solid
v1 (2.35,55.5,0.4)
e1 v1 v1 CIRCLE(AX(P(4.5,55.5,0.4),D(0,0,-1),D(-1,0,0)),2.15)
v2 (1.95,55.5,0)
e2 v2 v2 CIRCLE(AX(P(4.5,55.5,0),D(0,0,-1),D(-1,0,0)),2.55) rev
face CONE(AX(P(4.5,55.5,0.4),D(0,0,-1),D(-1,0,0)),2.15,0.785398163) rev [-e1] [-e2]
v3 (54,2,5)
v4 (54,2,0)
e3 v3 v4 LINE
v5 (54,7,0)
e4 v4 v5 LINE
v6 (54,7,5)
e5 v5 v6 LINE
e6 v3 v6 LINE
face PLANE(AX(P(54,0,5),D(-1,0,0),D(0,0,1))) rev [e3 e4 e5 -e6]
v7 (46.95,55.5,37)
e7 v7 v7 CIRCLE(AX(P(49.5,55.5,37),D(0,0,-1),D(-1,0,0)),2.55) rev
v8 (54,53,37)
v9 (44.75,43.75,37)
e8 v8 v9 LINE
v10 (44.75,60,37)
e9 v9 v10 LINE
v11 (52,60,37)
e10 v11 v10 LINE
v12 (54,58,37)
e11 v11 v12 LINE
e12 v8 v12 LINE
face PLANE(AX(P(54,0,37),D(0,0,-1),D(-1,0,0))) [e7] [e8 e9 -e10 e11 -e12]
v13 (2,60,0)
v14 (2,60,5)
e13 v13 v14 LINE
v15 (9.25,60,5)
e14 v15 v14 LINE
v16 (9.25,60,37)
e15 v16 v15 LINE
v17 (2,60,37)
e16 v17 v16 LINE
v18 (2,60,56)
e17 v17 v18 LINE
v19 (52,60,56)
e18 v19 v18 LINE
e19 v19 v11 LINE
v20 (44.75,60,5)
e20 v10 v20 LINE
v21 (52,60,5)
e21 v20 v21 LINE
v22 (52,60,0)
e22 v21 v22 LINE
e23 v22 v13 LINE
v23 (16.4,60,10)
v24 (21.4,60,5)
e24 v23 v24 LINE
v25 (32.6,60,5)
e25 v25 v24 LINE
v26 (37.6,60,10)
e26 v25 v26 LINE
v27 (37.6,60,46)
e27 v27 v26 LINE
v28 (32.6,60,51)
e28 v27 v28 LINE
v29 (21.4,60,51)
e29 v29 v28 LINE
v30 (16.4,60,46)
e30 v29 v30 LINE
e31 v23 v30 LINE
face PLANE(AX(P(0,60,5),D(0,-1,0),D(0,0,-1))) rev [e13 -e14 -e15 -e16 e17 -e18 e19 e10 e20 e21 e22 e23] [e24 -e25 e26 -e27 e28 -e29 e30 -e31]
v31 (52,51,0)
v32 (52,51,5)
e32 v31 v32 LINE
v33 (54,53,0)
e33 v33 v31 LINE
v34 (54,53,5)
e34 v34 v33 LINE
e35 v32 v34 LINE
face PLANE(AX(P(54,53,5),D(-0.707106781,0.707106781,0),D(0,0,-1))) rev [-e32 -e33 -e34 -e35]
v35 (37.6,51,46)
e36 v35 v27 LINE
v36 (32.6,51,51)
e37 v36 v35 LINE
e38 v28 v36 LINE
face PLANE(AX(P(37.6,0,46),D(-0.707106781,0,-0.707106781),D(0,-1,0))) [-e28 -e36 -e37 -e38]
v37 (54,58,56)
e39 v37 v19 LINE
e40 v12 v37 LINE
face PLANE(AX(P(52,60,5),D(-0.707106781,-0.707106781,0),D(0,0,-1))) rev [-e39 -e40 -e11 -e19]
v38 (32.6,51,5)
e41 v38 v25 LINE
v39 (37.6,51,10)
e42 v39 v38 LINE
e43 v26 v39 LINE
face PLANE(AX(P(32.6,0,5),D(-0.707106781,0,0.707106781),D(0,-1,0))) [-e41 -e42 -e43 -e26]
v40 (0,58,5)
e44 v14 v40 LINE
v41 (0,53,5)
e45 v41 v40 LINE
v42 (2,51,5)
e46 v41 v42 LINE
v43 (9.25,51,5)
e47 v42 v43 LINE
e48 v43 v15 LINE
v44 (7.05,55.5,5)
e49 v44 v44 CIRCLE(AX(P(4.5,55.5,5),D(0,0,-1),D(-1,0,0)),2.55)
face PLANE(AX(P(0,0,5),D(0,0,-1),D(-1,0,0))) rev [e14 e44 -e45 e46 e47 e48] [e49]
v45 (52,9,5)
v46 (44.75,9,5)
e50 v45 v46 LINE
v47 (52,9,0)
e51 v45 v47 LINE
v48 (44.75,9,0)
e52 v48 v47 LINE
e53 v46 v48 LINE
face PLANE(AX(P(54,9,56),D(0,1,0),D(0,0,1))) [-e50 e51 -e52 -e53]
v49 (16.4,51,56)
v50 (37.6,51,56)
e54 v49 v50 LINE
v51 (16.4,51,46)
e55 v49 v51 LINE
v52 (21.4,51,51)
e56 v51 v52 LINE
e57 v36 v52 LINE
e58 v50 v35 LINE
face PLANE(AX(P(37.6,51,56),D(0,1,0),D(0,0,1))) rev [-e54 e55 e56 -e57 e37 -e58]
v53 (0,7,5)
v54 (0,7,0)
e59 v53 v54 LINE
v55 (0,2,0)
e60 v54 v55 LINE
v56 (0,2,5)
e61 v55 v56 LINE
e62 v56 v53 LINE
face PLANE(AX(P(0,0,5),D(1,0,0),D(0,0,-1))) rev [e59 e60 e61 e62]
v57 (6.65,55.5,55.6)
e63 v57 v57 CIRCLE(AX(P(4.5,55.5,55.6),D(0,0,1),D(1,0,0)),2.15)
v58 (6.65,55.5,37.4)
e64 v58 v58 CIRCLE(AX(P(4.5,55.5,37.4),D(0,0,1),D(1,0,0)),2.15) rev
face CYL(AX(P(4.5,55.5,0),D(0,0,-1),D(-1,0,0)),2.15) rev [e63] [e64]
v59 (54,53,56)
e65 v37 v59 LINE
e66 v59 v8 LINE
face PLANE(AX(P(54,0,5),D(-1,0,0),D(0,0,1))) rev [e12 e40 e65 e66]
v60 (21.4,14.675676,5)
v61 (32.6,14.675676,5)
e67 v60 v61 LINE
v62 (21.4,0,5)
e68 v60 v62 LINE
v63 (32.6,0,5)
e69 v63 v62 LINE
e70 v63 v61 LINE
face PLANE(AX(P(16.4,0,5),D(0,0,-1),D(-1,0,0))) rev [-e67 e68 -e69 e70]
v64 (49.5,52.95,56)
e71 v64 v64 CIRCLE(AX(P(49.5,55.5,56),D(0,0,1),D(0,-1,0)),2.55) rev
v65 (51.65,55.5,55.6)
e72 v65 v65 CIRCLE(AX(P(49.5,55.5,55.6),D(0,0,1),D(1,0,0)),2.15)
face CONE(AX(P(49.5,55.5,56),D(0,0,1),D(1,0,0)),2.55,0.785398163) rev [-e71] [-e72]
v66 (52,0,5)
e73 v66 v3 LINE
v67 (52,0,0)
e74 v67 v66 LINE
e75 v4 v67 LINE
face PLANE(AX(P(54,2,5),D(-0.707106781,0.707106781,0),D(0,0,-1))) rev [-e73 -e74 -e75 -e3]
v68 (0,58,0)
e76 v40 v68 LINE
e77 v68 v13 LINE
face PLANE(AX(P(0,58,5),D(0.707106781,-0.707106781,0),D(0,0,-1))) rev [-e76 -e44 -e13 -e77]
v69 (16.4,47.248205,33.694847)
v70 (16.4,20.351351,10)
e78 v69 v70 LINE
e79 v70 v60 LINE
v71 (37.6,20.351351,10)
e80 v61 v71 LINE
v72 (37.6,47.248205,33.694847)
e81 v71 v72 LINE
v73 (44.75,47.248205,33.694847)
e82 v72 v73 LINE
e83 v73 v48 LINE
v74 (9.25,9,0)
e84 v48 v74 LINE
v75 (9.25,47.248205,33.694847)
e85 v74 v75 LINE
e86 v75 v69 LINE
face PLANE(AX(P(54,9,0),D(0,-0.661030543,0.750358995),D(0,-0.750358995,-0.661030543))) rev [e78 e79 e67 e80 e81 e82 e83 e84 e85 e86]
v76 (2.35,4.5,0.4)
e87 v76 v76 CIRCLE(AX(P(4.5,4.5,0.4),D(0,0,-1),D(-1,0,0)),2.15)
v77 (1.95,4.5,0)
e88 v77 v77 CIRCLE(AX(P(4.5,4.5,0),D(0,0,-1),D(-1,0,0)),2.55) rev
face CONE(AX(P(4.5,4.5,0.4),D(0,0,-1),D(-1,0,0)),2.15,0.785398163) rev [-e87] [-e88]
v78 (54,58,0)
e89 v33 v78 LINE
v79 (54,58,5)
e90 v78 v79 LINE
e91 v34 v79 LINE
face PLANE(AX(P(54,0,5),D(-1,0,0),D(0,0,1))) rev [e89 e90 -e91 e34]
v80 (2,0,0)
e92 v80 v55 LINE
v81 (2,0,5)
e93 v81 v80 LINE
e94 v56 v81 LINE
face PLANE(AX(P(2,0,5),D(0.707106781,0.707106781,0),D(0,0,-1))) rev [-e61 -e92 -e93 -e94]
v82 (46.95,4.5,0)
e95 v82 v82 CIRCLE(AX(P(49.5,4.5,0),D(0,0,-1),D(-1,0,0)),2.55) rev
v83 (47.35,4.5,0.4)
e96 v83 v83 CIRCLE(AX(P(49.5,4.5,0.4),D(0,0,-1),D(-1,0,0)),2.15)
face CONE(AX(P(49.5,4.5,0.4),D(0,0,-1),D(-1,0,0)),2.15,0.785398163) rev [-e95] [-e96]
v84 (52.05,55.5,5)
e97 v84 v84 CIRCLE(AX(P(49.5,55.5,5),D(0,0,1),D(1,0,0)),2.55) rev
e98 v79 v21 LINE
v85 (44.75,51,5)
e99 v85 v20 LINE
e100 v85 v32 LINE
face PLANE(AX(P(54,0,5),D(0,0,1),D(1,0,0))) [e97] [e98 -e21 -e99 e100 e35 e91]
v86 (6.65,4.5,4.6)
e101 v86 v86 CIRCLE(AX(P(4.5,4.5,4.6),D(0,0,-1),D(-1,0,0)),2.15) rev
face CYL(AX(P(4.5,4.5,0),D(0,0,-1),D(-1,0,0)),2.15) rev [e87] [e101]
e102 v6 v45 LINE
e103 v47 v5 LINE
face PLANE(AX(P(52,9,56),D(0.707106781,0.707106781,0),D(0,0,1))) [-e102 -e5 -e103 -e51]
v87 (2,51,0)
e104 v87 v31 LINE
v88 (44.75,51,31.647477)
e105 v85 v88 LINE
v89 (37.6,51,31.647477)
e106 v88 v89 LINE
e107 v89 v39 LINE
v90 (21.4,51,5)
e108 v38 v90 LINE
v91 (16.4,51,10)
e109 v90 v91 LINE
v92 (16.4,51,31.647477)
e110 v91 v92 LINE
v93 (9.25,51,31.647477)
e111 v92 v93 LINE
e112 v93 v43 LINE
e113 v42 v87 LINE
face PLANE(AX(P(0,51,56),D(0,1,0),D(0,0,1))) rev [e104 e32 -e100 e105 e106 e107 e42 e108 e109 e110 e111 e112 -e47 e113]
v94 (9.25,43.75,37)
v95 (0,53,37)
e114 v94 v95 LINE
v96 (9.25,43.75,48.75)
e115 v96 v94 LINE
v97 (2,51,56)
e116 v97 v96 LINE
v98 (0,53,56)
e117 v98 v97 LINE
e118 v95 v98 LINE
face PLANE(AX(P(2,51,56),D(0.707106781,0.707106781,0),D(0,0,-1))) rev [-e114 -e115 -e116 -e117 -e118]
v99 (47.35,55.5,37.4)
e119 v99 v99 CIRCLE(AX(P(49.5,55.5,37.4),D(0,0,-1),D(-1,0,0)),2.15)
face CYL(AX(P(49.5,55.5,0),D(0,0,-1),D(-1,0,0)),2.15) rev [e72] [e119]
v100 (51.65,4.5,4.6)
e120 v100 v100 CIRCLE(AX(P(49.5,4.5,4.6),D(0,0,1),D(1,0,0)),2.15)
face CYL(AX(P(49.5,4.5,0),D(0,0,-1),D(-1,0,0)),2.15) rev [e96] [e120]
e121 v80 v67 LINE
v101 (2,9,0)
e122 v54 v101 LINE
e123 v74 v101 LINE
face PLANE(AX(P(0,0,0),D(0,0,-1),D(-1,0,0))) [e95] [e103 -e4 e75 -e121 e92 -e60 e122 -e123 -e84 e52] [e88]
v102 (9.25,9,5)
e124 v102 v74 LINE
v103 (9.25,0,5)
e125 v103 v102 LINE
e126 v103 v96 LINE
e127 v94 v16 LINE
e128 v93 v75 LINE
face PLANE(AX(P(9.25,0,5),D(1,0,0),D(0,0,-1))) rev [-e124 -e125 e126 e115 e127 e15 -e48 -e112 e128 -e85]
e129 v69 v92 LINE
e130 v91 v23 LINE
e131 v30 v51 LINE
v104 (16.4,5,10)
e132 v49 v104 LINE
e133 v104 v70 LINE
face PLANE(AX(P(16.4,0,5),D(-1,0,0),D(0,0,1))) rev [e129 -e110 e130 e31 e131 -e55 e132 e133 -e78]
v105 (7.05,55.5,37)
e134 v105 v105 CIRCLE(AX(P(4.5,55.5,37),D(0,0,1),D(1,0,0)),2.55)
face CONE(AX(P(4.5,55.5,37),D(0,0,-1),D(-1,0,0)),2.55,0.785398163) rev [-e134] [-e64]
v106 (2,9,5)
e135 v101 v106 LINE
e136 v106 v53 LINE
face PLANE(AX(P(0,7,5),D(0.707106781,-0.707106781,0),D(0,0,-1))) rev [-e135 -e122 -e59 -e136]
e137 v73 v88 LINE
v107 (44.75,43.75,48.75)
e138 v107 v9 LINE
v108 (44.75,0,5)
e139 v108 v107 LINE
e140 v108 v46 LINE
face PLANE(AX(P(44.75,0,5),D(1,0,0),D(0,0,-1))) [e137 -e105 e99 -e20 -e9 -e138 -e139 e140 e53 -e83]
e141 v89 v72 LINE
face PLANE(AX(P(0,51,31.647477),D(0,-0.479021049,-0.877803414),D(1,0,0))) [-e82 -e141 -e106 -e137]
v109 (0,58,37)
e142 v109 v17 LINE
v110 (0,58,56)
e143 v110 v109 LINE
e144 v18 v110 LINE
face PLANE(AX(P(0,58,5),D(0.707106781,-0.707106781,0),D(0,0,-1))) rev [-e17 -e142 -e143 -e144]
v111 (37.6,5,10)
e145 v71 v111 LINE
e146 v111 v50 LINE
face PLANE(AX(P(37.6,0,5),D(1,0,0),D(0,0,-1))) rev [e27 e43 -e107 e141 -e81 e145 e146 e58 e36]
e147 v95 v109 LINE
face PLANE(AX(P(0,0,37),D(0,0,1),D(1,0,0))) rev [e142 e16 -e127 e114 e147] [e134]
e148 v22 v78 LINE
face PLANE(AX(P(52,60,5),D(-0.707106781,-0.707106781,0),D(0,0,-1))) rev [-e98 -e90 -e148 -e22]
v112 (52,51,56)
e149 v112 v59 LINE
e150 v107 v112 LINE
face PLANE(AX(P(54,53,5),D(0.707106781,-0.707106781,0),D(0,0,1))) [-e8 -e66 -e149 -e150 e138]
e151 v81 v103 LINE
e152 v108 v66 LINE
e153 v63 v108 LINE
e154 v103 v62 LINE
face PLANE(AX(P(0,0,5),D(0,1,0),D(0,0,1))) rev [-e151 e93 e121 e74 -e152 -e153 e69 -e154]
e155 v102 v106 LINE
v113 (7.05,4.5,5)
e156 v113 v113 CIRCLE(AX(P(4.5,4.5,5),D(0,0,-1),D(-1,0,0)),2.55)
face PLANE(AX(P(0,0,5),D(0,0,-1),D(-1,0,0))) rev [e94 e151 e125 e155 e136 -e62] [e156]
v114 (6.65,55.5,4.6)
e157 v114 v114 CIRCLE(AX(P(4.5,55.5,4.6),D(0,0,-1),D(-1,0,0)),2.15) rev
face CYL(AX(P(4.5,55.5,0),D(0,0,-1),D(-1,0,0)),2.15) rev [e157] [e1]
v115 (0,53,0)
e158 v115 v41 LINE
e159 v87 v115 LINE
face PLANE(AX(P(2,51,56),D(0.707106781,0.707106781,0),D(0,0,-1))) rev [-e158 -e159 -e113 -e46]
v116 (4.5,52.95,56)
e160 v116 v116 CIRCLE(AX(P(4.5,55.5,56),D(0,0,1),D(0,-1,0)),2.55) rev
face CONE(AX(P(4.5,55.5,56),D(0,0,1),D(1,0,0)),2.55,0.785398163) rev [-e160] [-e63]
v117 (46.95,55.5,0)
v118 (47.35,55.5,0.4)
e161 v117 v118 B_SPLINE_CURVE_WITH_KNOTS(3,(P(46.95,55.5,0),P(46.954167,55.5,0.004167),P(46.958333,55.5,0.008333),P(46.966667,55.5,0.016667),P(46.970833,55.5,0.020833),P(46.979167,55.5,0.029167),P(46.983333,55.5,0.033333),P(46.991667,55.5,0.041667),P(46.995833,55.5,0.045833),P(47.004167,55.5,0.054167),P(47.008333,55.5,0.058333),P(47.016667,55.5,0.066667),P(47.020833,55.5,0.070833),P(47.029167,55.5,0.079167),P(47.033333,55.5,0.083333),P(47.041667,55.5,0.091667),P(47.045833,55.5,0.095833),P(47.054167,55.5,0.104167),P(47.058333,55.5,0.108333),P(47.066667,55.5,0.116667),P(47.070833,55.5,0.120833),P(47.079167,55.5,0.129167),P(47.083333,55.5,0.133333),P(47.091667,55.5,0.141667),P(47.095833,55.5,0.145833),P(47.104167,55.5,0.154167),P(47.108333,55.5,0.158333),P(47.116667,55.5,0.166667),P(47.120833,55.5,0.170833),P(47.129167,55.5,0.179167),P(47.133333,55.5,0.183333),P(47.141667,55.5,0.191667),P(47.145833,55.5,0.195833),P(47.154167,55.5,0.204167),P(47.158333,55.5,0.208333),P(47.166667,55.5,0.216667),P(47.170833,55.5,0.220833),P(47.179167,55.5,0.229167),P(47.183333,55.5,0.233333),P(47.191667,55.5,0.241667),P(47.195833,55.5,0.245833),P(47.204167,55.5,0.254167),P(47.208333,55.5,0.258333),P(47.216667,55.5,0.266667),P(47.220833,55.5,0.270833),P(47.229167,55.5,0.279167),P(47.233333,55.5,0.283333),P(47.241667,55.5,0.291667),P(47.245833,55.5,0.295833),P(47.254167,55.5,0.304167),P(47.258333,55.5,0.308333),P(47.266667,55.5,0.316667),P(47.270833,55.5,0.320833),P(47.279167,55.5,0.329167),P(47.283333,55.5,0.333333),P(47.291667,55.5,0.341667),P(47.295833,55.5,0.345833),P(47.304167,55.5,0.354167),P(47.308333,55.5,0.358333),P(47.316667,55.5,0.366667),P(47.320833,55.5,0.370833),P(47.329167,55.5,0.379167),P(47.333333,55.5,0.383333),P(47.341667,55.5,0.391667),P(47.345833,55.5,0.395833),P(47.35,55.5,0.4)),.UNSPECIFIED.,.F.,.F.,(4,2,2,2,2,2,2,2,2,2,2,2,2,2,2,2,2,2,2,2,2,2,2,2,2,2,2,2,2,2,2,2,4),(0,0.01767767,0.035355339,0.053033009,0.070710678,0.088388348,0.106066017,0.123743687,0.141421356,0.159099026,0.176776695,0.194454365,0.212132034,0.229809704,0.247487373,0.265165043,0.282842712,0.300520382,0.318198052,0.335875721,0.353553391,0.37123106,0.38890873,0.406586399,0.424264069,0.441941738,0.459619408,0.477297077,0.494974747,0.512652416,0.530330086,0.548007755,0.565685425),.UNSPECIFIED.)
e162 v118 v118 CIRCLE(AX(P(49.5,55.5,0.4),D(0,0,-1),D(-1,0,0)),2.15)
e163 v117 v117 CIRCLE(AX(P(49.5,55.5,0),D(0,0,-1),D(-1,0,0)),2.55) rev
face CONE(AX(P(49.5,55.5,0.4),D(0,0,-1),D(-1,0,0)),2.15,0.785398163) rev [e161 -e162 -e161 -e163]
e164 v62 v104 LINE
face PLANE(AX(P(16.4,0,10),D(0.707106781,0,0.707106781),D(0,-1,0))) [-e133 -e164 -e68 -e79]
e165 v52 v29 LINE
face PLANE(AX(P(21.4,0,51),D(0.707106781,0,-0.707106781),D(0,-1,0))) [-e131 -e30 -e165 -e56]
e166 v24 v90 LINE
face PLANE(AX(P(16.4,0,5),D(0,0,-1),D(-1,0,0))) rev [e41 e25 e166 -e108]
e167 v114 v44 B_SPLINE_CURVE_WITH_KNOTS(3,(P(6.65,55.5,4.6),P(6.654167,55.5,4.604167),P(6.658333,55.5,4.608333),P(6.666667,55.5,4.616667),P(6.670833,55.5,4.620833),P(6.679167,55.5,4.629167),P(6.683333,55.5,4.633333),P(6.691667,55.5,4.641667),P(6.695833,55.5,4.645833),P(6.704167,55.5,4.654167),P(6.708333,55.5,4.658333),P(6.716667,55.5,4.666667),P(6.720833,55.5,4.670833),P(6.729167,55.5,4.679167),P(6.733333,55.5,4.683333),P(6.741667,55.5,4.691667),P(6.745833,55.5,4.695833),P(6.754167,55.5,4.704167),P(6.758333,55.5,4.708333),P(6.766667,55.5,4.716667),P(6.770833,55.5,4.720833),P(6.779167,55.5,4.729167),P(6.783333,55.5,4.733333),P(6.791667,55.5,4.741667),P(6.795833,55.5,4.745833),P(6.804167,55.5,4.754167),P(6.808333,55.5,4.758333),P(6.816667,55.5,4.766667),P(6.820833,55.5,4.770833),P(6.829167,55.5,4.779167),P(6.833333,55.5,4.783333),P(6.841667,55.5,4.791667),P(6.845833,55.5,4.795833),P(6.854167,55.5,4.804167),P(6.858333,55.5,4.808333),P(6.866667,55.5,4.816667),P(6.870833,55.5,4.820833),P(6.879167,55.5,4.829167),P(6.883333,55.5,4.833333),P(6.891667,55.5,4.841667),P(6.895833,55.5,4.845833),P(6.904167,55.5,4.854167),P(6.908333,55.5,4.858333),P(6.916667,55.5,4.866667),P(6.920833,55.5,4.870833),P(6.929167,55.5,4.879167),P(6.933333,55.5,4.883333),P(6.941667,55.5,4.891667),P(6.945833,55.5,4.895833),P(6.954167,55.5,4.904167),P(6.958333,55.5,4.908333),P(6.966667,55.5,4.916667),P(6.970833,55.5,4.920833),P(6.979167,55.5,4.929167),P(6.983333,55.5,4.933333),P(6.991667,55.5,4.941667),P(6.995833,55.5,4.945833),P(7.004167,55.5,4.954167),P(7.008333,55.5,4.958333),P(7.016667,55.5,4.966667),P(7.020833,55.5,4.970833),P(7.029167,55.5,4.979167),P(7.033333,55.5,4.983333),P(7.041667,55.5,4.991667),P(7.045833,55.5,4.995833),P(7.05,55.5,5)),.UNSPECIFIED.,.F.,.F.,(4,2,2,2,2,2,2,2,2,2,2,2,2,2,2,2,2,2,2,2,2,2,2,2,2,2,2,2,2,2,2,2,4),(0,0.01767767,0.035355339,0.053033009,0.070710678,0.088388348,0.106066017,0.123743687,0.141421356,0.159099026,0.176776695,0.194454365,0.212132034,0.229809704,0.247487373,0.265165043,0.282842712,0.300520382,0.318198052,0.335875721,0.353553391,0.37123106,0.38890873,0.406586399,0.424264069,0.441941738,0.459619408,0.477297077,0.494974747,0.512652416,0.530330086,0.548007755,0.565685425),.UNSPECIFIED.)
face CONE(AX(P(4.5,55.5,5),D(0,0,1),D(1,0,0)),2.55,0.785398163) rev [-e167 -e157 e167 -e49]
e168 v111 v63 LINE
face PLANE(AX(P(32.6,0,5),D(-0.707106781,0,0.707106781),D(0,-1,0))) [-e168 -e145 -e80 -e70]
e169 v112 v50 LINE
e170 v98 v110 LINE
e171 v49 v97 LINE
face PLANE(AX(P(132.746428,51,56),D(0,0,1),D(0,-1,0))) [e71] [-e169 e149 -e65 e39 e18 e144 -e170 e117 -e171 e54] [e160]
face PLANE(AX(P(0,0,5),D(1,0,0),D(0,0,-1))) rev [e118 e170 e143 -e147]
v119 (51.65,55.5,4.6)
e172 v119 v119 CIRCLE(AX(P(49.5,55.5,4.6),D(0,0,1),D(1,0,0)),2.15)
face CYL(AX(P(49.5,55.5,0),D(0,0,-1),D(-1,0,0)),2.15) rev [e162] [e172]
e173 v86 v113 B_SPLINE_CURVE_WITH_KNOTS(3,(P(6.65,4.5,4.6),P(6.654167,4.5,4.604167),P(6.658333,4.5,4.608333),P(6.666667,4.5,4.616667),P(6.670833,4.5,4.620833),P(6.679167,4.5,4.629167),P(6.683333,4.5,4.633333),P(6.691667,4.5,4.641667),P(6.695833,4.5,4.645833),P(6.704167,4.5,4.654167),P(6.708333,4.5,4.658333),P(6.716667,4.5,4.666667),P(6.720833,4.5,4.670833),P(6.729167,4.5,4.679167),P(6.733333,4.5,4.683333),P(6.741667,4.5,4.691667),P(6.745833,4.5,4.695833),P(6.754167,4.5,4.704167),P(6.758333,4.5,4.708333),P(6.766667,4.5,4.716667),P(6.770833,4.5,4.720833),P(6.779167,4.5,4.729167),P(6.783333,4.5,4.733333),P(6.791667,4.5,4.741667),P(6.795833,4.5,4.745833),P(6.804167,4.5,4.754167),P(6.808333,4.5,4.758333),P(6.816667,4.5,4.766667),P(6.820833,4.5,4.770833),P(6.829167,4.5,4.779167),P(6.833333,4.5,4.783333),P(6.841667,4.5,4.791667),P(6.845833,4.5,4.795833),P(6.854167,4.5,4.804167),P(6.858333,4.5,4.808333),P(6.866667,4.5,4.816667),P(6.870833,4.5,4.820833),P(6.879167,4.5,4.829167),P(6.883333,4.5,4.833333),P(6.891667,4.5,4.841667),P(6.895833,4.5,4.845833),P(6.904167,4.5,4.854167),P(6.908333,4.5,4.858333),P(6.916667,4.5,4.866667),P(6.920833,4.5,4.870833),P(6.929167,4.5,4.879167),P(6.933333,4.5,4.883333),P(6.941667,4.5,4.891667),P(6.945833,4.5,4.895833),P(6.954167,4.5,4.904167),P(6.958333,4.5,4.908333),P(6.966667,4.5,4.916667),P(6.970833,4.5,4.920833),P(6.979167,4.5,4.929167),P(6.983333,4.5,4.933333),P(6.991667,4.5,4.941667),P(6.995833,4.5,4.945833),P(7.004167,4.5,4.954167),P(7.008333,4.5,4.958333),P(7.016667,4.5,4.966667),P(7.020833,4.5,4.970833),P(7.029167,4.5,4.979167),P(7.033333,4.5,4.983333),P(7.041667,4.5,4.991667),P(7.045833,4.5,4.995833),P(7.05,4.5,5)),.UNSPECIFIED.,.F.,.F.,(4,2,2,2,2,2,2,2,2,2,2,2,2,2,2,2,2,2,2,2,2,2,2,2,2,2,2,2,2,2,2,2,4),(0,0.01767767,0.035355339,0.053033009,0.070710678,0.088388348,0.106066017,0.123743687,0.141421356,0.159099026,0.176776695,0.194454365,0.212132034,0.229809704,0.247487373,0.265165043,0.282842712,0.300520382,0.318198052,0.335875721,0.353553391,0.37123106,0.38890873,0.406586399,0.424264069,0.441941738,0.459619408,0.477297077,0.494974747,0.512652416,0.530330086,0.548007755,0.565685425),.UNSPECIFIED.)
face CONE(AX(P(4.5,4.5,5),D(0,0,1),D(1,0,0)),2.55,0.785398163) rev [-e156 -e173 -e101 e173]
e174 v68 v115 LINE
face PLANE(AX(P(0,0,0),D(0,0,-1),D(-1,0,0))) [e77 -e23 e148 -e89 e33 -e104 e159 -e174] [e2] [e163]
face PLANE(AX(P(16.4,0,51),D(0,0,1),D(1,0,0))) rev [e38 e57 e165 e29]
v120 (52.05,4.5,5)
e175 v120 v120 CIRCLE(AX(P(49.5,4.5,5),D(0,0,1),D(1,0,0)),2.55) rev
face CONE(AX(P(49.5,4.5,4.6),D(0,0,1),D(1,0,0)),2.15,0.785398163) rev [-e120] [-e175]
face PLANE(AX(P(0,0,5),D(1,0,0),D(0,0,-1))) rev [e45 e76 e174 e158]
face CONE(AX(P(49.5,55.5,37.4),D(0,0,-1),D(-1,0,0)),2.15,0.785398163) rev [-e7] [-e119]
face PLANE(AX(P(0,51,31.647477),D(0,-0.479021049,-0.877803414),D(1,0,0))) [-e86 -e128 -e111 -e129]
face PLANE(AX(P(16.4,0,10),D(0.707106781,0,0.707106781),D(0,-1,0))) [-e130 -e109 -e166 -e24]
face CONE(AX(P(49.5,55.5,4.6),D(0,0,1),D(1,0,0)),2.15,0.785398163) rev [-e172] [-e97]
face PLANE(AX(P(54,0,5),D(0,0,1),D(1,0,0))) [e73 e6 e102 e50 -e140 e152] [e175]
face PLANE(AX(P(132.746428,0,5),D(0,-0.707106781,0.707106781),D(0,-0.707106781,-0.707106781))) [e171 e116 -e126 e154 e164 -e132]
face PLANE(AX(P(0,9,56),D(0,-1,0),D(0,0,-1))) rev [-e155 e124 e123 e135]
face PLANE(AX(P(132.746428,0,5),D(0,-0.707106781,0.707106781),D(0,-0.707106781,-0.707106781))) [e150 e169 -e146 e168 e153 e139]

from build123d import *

# Parameters (mm, degrees)
SKETCH1_W               = 54
SKETCH1_H               = 60
BOSS_EXTRUDE1_DEPTH     = 5
BOSS_EXTRUDE2_DEPTH     = 54
SKETCH6_W               = 9.25
SKETCH6_H               = 32
CUT_EXTRUDE1_DEPTH      = 99.244592727
SKETCH8_W               = 9.25
SKETCH8_H               = 42
CUT_EXTRUDE3_DEPTH      = 99.244592727
M4_CLEARANCE_HOLE2_D    = 4.3
CUT_EXTRUDE4_DEPTH      = 94.480278669
SKETCH12_W              = 21.2
SKETCH12_H              = 46
CUT_EXTRUDE5_DEPTH      = 99.244592727
CHAMFER1_SIZE           = 2
CHAMFER2_SIZE           = 5
CHAMFER2_SIZE_2         = 5.352523158
SKETCH13_W              = 21.2
SKETCH13_H              = 5
CUT_EXTRUDE6_DEPTH      = 99.244592727
CHAMFER3_SIZE           = 5
BOSS_EXTRUDE3_DEPTH     = 19
CUT_EXTRUDE7_DEPTH      = 94.480278669
CUT_EXTRUDE7_DEPTH_BACK = 94.480278669
CHAMFER4_SIZE           = 0.4
CHAMFER5_SIZE           = 0.4


with BuildPart() as part:
    # Sketch1 → Boss-Extrude1 (new body)
    with BuildSketch(Plane.XY):
        with Locations((27, 30)):
            Rectangle(SKETCH1_W, SKETCH1_H)
    extrude(amount=BOSS_EXTRUDE1_DEPTH)

    # Sketch5 → Boss-Extrude2 (add)
    with BuildSketch(Plane.ZY):
        Polygon((56, 60), (5, 60), (5, 0), (56, 51), align=None)
    extrude(amount=-BOSS_EXTRUDE2_DEPTH)

    # Sketch6 → Cut-Extrude1 (cut, through all)
    with BuildSketch(Plane(origin=(0, 60, 0), x_dir=(1, 0, 0), z_dir=(0, 1, 0))):
        with Locations((4.625, -21)):
            Rectangle(SKETCH6_W, SKETCH6_H)
    cut_extrude1 = extrude(amount=-CUT_EXTRUDE1_DEPTH, mode=Mode.SUBTRACT)

    # Sketch8 → Cut-Extrude3 (cut, through all)
    with BuildSketch(Plane(origin=(0, 0, 0), x_dir=(-1, 0, 0), z_dir=(0, 0, -1))):
        with Locations((-4.625, 30)):
            Rectangle(SKETCH8_W, SKETCH8_H)
    cut_extrude3 = extrude(amount=-CUT_EXTRUDE3_DEPTH, mode=Mode.SUBTRACT)

    # Mirror1: Cut-Extrude1, Cut-Extrude3 across plane
    add(cut_extrude1.mirror(Plane(origin=(27, 0, 0), x_dir=(0, 0, 1), z_dir=(1, 0, 0))), mode=Mode.SUBTRACT)
    add(cut_extrude3.mirror(Plane(origin=(27, 0, 0), x_dir=(0, 0, 1), z_dir=(1, 0, 0))), mode=Mode.SUBTRACT)

    # M4 Clearance Hole2 (through all)
    with Locations(Plane(origin=(0, 0, 0), x_dir=(-1, 0, 0), z_dir=(0, 0, -1))):
        with Locations((-4.5, 55.5), (-49.5, 55.5), (-49.5, 4.5), (-4.5, 4.5)):
            Hole(M4_CLEARANCE_HOLE2_D / 2)

    # Sketch11 → Cut-Extrude4 (cut, through all)
    with BuildSketch(Plane.ZY.offset(-9.25)):
        Polygon((0, 9), (37, 51), (0, 51), align=None)
    extrude(amount=-CUT_EXTRUDE4_DEPTH, mode=Mode.SUBTRACT)

    # Sketch12 → Cut-Extrude5 (cut, through all)
    with BuildSketch(Plane(origin=(0, 60, 0), x_dir=(1, 0, 0), z_dir=(0, 1, 0))):
        with Locations((27, -28)):
            Rectangle(SKETCH12_W, SKETCH12_H)
    extrude(amount=-CUT_EXTRUDE5_DEPTH, mode=Mode.SUBTRACT)

    # Chamfer1
    chamfer1_edges = [part.edges().sort_by_distance(p)[0] for p in [
        (0, 60, 2.5),
        (0, 9, 2.5),
        (0, 51, 2.5),
        (0, 51, 46.5),
        (54, 60, 2.5),
        (0, 60, 46.5),
        (54, 60, 46.5),
        (54, 0, 2.5),
        (0, 0, 2.5),
        (54, 51, 46.5),
        (54, 9, 2.5),
        (54, 51, 2.5),
    ]]
    chamfer(chamfer1_edges, length=CHAMFER1_SIZE)

    # Chamfer2
    # the kernel refuses this chamfer: 5.352523158, 5 mm, written as the material it adds along each edge
    with BuildSketch(Plane(origin=(37.6, 51, 37), x_dir=(0, -0.7759635654606418, -0.6307777303278932), z_dir=(1, 0, 0)), Plane(origin=(9.25, 51, 37), x_dir=(0, -0.7759635654606418, -0.6307777303278932), z_dir=(1, 0, 0))) as chamfer2_piece_1:
        Polygon((CHAMFER2_SIZE * 0.999214586642, CHAMFER2_SIZE * 0.039625873385), (CHAMFER2_SIZE_2 * 0.630777730356, CHAMFER2_SIZE_2 * 0.775963565495), (0, 0), align=None)
    extrude(amount=7.15)

    # Sketch13 → Cut-Extrude6 (cut, through all)
    with BuildSketch(Plane(origin=(0, 0, 0), x_dir=(-1, 0, 0), z_dir=(0, 0, -1))):
        with Locations((-27, 48.5)):
            Rectangle(SKETCH13_W, SKETCH13_H)
    extrude(amount=-CUT_EXTRUDE6_DEPTH, mode=Mode.SUBTRACT)

    # Chamfer3
    chamfer3_edges = [part.edges().sort_by_distance(p)[0] for p in [
        (16.4, 55.5, 5),
        (16.4, 7.337837838, 5),
        (37.6, 7.337837838, 5),
        (37.6, 55.5, 5),
        (16.4, 55.5, 51),
        (37.6, 55.5, 51),
    ]]
    chamfer(chamfer3_edges, length=CHAMFER3_SIZE)

    # Sketch14 → Boss-Extrude3 (add)
    with BuildSketch(Plane(origin=(0, 0, 37), x_dir=(-1, 0, 0), z_dir=(0, 0, -1))):
        Polygon((-2, 51), (-9.25, 43.75), (-9.25, 51), align=None)
    boss_extrude3 = extrude(amount=-BOSS_EXTRUDE3_DEPTH)

    # Mirror3: Boss-Extrude3 across plane
    add(boss_extrude3.mirror(Plane(origin=(27, 0, 0), x_dir=(0, 0, 1), z_dir=(1, 0, 0))))

    # Sketch15 → Cut-Extrude7 (cut, two sides: drawn at the far end of the back side and taken through both)
    with BuildSketch(Plane(origin=(9.25, 0, 0), x_dir=(0, 0, -1), z_dir=(1, 0, 0)).offset(-CUT_EXTRUDE7_DEPTH_BACK)):
        Polygon((-48.75, 43.75), (-56, 51), (-56, 43.75), align=None)
    extrude(amount=CUT_EXTRUDE7_DEPTH + CUT_EXTRUDE7_DEPTH_BACK, mode=Mode.SUBTRACT)

    # Chamfer4
    chamfer4_edges = [part.edges().sort_by_distance(p)[0] for p in [
        (47.35, 55.5, 37),
        (47.35, 55.5, 56),
        (2.35, 55.5, 56),
        (2.35, 55.5, 37),
    ]]
    chamfer(chamfer4_edges, length=CHAMFER4_SIZE)

    # Chamfer5
    chamfer5_edges = [part.edges().sort_by_distance(p)[0] for p in [
        (2.35, 4.5, 5),
        (2.35, 4.5, 0),
        (47.35, 4.5, 5),
        (47.35, 4.5, 0),
        (47.35, 55.5, 5),
        (47.35, 55.5, 0),
        (2.35, 55.5, 5),
        (2.35, 55.5, 0),
    ]]
    chamfer(chamfer5_edges, length=CHAMFER5_SIZE)


solid = part.part
